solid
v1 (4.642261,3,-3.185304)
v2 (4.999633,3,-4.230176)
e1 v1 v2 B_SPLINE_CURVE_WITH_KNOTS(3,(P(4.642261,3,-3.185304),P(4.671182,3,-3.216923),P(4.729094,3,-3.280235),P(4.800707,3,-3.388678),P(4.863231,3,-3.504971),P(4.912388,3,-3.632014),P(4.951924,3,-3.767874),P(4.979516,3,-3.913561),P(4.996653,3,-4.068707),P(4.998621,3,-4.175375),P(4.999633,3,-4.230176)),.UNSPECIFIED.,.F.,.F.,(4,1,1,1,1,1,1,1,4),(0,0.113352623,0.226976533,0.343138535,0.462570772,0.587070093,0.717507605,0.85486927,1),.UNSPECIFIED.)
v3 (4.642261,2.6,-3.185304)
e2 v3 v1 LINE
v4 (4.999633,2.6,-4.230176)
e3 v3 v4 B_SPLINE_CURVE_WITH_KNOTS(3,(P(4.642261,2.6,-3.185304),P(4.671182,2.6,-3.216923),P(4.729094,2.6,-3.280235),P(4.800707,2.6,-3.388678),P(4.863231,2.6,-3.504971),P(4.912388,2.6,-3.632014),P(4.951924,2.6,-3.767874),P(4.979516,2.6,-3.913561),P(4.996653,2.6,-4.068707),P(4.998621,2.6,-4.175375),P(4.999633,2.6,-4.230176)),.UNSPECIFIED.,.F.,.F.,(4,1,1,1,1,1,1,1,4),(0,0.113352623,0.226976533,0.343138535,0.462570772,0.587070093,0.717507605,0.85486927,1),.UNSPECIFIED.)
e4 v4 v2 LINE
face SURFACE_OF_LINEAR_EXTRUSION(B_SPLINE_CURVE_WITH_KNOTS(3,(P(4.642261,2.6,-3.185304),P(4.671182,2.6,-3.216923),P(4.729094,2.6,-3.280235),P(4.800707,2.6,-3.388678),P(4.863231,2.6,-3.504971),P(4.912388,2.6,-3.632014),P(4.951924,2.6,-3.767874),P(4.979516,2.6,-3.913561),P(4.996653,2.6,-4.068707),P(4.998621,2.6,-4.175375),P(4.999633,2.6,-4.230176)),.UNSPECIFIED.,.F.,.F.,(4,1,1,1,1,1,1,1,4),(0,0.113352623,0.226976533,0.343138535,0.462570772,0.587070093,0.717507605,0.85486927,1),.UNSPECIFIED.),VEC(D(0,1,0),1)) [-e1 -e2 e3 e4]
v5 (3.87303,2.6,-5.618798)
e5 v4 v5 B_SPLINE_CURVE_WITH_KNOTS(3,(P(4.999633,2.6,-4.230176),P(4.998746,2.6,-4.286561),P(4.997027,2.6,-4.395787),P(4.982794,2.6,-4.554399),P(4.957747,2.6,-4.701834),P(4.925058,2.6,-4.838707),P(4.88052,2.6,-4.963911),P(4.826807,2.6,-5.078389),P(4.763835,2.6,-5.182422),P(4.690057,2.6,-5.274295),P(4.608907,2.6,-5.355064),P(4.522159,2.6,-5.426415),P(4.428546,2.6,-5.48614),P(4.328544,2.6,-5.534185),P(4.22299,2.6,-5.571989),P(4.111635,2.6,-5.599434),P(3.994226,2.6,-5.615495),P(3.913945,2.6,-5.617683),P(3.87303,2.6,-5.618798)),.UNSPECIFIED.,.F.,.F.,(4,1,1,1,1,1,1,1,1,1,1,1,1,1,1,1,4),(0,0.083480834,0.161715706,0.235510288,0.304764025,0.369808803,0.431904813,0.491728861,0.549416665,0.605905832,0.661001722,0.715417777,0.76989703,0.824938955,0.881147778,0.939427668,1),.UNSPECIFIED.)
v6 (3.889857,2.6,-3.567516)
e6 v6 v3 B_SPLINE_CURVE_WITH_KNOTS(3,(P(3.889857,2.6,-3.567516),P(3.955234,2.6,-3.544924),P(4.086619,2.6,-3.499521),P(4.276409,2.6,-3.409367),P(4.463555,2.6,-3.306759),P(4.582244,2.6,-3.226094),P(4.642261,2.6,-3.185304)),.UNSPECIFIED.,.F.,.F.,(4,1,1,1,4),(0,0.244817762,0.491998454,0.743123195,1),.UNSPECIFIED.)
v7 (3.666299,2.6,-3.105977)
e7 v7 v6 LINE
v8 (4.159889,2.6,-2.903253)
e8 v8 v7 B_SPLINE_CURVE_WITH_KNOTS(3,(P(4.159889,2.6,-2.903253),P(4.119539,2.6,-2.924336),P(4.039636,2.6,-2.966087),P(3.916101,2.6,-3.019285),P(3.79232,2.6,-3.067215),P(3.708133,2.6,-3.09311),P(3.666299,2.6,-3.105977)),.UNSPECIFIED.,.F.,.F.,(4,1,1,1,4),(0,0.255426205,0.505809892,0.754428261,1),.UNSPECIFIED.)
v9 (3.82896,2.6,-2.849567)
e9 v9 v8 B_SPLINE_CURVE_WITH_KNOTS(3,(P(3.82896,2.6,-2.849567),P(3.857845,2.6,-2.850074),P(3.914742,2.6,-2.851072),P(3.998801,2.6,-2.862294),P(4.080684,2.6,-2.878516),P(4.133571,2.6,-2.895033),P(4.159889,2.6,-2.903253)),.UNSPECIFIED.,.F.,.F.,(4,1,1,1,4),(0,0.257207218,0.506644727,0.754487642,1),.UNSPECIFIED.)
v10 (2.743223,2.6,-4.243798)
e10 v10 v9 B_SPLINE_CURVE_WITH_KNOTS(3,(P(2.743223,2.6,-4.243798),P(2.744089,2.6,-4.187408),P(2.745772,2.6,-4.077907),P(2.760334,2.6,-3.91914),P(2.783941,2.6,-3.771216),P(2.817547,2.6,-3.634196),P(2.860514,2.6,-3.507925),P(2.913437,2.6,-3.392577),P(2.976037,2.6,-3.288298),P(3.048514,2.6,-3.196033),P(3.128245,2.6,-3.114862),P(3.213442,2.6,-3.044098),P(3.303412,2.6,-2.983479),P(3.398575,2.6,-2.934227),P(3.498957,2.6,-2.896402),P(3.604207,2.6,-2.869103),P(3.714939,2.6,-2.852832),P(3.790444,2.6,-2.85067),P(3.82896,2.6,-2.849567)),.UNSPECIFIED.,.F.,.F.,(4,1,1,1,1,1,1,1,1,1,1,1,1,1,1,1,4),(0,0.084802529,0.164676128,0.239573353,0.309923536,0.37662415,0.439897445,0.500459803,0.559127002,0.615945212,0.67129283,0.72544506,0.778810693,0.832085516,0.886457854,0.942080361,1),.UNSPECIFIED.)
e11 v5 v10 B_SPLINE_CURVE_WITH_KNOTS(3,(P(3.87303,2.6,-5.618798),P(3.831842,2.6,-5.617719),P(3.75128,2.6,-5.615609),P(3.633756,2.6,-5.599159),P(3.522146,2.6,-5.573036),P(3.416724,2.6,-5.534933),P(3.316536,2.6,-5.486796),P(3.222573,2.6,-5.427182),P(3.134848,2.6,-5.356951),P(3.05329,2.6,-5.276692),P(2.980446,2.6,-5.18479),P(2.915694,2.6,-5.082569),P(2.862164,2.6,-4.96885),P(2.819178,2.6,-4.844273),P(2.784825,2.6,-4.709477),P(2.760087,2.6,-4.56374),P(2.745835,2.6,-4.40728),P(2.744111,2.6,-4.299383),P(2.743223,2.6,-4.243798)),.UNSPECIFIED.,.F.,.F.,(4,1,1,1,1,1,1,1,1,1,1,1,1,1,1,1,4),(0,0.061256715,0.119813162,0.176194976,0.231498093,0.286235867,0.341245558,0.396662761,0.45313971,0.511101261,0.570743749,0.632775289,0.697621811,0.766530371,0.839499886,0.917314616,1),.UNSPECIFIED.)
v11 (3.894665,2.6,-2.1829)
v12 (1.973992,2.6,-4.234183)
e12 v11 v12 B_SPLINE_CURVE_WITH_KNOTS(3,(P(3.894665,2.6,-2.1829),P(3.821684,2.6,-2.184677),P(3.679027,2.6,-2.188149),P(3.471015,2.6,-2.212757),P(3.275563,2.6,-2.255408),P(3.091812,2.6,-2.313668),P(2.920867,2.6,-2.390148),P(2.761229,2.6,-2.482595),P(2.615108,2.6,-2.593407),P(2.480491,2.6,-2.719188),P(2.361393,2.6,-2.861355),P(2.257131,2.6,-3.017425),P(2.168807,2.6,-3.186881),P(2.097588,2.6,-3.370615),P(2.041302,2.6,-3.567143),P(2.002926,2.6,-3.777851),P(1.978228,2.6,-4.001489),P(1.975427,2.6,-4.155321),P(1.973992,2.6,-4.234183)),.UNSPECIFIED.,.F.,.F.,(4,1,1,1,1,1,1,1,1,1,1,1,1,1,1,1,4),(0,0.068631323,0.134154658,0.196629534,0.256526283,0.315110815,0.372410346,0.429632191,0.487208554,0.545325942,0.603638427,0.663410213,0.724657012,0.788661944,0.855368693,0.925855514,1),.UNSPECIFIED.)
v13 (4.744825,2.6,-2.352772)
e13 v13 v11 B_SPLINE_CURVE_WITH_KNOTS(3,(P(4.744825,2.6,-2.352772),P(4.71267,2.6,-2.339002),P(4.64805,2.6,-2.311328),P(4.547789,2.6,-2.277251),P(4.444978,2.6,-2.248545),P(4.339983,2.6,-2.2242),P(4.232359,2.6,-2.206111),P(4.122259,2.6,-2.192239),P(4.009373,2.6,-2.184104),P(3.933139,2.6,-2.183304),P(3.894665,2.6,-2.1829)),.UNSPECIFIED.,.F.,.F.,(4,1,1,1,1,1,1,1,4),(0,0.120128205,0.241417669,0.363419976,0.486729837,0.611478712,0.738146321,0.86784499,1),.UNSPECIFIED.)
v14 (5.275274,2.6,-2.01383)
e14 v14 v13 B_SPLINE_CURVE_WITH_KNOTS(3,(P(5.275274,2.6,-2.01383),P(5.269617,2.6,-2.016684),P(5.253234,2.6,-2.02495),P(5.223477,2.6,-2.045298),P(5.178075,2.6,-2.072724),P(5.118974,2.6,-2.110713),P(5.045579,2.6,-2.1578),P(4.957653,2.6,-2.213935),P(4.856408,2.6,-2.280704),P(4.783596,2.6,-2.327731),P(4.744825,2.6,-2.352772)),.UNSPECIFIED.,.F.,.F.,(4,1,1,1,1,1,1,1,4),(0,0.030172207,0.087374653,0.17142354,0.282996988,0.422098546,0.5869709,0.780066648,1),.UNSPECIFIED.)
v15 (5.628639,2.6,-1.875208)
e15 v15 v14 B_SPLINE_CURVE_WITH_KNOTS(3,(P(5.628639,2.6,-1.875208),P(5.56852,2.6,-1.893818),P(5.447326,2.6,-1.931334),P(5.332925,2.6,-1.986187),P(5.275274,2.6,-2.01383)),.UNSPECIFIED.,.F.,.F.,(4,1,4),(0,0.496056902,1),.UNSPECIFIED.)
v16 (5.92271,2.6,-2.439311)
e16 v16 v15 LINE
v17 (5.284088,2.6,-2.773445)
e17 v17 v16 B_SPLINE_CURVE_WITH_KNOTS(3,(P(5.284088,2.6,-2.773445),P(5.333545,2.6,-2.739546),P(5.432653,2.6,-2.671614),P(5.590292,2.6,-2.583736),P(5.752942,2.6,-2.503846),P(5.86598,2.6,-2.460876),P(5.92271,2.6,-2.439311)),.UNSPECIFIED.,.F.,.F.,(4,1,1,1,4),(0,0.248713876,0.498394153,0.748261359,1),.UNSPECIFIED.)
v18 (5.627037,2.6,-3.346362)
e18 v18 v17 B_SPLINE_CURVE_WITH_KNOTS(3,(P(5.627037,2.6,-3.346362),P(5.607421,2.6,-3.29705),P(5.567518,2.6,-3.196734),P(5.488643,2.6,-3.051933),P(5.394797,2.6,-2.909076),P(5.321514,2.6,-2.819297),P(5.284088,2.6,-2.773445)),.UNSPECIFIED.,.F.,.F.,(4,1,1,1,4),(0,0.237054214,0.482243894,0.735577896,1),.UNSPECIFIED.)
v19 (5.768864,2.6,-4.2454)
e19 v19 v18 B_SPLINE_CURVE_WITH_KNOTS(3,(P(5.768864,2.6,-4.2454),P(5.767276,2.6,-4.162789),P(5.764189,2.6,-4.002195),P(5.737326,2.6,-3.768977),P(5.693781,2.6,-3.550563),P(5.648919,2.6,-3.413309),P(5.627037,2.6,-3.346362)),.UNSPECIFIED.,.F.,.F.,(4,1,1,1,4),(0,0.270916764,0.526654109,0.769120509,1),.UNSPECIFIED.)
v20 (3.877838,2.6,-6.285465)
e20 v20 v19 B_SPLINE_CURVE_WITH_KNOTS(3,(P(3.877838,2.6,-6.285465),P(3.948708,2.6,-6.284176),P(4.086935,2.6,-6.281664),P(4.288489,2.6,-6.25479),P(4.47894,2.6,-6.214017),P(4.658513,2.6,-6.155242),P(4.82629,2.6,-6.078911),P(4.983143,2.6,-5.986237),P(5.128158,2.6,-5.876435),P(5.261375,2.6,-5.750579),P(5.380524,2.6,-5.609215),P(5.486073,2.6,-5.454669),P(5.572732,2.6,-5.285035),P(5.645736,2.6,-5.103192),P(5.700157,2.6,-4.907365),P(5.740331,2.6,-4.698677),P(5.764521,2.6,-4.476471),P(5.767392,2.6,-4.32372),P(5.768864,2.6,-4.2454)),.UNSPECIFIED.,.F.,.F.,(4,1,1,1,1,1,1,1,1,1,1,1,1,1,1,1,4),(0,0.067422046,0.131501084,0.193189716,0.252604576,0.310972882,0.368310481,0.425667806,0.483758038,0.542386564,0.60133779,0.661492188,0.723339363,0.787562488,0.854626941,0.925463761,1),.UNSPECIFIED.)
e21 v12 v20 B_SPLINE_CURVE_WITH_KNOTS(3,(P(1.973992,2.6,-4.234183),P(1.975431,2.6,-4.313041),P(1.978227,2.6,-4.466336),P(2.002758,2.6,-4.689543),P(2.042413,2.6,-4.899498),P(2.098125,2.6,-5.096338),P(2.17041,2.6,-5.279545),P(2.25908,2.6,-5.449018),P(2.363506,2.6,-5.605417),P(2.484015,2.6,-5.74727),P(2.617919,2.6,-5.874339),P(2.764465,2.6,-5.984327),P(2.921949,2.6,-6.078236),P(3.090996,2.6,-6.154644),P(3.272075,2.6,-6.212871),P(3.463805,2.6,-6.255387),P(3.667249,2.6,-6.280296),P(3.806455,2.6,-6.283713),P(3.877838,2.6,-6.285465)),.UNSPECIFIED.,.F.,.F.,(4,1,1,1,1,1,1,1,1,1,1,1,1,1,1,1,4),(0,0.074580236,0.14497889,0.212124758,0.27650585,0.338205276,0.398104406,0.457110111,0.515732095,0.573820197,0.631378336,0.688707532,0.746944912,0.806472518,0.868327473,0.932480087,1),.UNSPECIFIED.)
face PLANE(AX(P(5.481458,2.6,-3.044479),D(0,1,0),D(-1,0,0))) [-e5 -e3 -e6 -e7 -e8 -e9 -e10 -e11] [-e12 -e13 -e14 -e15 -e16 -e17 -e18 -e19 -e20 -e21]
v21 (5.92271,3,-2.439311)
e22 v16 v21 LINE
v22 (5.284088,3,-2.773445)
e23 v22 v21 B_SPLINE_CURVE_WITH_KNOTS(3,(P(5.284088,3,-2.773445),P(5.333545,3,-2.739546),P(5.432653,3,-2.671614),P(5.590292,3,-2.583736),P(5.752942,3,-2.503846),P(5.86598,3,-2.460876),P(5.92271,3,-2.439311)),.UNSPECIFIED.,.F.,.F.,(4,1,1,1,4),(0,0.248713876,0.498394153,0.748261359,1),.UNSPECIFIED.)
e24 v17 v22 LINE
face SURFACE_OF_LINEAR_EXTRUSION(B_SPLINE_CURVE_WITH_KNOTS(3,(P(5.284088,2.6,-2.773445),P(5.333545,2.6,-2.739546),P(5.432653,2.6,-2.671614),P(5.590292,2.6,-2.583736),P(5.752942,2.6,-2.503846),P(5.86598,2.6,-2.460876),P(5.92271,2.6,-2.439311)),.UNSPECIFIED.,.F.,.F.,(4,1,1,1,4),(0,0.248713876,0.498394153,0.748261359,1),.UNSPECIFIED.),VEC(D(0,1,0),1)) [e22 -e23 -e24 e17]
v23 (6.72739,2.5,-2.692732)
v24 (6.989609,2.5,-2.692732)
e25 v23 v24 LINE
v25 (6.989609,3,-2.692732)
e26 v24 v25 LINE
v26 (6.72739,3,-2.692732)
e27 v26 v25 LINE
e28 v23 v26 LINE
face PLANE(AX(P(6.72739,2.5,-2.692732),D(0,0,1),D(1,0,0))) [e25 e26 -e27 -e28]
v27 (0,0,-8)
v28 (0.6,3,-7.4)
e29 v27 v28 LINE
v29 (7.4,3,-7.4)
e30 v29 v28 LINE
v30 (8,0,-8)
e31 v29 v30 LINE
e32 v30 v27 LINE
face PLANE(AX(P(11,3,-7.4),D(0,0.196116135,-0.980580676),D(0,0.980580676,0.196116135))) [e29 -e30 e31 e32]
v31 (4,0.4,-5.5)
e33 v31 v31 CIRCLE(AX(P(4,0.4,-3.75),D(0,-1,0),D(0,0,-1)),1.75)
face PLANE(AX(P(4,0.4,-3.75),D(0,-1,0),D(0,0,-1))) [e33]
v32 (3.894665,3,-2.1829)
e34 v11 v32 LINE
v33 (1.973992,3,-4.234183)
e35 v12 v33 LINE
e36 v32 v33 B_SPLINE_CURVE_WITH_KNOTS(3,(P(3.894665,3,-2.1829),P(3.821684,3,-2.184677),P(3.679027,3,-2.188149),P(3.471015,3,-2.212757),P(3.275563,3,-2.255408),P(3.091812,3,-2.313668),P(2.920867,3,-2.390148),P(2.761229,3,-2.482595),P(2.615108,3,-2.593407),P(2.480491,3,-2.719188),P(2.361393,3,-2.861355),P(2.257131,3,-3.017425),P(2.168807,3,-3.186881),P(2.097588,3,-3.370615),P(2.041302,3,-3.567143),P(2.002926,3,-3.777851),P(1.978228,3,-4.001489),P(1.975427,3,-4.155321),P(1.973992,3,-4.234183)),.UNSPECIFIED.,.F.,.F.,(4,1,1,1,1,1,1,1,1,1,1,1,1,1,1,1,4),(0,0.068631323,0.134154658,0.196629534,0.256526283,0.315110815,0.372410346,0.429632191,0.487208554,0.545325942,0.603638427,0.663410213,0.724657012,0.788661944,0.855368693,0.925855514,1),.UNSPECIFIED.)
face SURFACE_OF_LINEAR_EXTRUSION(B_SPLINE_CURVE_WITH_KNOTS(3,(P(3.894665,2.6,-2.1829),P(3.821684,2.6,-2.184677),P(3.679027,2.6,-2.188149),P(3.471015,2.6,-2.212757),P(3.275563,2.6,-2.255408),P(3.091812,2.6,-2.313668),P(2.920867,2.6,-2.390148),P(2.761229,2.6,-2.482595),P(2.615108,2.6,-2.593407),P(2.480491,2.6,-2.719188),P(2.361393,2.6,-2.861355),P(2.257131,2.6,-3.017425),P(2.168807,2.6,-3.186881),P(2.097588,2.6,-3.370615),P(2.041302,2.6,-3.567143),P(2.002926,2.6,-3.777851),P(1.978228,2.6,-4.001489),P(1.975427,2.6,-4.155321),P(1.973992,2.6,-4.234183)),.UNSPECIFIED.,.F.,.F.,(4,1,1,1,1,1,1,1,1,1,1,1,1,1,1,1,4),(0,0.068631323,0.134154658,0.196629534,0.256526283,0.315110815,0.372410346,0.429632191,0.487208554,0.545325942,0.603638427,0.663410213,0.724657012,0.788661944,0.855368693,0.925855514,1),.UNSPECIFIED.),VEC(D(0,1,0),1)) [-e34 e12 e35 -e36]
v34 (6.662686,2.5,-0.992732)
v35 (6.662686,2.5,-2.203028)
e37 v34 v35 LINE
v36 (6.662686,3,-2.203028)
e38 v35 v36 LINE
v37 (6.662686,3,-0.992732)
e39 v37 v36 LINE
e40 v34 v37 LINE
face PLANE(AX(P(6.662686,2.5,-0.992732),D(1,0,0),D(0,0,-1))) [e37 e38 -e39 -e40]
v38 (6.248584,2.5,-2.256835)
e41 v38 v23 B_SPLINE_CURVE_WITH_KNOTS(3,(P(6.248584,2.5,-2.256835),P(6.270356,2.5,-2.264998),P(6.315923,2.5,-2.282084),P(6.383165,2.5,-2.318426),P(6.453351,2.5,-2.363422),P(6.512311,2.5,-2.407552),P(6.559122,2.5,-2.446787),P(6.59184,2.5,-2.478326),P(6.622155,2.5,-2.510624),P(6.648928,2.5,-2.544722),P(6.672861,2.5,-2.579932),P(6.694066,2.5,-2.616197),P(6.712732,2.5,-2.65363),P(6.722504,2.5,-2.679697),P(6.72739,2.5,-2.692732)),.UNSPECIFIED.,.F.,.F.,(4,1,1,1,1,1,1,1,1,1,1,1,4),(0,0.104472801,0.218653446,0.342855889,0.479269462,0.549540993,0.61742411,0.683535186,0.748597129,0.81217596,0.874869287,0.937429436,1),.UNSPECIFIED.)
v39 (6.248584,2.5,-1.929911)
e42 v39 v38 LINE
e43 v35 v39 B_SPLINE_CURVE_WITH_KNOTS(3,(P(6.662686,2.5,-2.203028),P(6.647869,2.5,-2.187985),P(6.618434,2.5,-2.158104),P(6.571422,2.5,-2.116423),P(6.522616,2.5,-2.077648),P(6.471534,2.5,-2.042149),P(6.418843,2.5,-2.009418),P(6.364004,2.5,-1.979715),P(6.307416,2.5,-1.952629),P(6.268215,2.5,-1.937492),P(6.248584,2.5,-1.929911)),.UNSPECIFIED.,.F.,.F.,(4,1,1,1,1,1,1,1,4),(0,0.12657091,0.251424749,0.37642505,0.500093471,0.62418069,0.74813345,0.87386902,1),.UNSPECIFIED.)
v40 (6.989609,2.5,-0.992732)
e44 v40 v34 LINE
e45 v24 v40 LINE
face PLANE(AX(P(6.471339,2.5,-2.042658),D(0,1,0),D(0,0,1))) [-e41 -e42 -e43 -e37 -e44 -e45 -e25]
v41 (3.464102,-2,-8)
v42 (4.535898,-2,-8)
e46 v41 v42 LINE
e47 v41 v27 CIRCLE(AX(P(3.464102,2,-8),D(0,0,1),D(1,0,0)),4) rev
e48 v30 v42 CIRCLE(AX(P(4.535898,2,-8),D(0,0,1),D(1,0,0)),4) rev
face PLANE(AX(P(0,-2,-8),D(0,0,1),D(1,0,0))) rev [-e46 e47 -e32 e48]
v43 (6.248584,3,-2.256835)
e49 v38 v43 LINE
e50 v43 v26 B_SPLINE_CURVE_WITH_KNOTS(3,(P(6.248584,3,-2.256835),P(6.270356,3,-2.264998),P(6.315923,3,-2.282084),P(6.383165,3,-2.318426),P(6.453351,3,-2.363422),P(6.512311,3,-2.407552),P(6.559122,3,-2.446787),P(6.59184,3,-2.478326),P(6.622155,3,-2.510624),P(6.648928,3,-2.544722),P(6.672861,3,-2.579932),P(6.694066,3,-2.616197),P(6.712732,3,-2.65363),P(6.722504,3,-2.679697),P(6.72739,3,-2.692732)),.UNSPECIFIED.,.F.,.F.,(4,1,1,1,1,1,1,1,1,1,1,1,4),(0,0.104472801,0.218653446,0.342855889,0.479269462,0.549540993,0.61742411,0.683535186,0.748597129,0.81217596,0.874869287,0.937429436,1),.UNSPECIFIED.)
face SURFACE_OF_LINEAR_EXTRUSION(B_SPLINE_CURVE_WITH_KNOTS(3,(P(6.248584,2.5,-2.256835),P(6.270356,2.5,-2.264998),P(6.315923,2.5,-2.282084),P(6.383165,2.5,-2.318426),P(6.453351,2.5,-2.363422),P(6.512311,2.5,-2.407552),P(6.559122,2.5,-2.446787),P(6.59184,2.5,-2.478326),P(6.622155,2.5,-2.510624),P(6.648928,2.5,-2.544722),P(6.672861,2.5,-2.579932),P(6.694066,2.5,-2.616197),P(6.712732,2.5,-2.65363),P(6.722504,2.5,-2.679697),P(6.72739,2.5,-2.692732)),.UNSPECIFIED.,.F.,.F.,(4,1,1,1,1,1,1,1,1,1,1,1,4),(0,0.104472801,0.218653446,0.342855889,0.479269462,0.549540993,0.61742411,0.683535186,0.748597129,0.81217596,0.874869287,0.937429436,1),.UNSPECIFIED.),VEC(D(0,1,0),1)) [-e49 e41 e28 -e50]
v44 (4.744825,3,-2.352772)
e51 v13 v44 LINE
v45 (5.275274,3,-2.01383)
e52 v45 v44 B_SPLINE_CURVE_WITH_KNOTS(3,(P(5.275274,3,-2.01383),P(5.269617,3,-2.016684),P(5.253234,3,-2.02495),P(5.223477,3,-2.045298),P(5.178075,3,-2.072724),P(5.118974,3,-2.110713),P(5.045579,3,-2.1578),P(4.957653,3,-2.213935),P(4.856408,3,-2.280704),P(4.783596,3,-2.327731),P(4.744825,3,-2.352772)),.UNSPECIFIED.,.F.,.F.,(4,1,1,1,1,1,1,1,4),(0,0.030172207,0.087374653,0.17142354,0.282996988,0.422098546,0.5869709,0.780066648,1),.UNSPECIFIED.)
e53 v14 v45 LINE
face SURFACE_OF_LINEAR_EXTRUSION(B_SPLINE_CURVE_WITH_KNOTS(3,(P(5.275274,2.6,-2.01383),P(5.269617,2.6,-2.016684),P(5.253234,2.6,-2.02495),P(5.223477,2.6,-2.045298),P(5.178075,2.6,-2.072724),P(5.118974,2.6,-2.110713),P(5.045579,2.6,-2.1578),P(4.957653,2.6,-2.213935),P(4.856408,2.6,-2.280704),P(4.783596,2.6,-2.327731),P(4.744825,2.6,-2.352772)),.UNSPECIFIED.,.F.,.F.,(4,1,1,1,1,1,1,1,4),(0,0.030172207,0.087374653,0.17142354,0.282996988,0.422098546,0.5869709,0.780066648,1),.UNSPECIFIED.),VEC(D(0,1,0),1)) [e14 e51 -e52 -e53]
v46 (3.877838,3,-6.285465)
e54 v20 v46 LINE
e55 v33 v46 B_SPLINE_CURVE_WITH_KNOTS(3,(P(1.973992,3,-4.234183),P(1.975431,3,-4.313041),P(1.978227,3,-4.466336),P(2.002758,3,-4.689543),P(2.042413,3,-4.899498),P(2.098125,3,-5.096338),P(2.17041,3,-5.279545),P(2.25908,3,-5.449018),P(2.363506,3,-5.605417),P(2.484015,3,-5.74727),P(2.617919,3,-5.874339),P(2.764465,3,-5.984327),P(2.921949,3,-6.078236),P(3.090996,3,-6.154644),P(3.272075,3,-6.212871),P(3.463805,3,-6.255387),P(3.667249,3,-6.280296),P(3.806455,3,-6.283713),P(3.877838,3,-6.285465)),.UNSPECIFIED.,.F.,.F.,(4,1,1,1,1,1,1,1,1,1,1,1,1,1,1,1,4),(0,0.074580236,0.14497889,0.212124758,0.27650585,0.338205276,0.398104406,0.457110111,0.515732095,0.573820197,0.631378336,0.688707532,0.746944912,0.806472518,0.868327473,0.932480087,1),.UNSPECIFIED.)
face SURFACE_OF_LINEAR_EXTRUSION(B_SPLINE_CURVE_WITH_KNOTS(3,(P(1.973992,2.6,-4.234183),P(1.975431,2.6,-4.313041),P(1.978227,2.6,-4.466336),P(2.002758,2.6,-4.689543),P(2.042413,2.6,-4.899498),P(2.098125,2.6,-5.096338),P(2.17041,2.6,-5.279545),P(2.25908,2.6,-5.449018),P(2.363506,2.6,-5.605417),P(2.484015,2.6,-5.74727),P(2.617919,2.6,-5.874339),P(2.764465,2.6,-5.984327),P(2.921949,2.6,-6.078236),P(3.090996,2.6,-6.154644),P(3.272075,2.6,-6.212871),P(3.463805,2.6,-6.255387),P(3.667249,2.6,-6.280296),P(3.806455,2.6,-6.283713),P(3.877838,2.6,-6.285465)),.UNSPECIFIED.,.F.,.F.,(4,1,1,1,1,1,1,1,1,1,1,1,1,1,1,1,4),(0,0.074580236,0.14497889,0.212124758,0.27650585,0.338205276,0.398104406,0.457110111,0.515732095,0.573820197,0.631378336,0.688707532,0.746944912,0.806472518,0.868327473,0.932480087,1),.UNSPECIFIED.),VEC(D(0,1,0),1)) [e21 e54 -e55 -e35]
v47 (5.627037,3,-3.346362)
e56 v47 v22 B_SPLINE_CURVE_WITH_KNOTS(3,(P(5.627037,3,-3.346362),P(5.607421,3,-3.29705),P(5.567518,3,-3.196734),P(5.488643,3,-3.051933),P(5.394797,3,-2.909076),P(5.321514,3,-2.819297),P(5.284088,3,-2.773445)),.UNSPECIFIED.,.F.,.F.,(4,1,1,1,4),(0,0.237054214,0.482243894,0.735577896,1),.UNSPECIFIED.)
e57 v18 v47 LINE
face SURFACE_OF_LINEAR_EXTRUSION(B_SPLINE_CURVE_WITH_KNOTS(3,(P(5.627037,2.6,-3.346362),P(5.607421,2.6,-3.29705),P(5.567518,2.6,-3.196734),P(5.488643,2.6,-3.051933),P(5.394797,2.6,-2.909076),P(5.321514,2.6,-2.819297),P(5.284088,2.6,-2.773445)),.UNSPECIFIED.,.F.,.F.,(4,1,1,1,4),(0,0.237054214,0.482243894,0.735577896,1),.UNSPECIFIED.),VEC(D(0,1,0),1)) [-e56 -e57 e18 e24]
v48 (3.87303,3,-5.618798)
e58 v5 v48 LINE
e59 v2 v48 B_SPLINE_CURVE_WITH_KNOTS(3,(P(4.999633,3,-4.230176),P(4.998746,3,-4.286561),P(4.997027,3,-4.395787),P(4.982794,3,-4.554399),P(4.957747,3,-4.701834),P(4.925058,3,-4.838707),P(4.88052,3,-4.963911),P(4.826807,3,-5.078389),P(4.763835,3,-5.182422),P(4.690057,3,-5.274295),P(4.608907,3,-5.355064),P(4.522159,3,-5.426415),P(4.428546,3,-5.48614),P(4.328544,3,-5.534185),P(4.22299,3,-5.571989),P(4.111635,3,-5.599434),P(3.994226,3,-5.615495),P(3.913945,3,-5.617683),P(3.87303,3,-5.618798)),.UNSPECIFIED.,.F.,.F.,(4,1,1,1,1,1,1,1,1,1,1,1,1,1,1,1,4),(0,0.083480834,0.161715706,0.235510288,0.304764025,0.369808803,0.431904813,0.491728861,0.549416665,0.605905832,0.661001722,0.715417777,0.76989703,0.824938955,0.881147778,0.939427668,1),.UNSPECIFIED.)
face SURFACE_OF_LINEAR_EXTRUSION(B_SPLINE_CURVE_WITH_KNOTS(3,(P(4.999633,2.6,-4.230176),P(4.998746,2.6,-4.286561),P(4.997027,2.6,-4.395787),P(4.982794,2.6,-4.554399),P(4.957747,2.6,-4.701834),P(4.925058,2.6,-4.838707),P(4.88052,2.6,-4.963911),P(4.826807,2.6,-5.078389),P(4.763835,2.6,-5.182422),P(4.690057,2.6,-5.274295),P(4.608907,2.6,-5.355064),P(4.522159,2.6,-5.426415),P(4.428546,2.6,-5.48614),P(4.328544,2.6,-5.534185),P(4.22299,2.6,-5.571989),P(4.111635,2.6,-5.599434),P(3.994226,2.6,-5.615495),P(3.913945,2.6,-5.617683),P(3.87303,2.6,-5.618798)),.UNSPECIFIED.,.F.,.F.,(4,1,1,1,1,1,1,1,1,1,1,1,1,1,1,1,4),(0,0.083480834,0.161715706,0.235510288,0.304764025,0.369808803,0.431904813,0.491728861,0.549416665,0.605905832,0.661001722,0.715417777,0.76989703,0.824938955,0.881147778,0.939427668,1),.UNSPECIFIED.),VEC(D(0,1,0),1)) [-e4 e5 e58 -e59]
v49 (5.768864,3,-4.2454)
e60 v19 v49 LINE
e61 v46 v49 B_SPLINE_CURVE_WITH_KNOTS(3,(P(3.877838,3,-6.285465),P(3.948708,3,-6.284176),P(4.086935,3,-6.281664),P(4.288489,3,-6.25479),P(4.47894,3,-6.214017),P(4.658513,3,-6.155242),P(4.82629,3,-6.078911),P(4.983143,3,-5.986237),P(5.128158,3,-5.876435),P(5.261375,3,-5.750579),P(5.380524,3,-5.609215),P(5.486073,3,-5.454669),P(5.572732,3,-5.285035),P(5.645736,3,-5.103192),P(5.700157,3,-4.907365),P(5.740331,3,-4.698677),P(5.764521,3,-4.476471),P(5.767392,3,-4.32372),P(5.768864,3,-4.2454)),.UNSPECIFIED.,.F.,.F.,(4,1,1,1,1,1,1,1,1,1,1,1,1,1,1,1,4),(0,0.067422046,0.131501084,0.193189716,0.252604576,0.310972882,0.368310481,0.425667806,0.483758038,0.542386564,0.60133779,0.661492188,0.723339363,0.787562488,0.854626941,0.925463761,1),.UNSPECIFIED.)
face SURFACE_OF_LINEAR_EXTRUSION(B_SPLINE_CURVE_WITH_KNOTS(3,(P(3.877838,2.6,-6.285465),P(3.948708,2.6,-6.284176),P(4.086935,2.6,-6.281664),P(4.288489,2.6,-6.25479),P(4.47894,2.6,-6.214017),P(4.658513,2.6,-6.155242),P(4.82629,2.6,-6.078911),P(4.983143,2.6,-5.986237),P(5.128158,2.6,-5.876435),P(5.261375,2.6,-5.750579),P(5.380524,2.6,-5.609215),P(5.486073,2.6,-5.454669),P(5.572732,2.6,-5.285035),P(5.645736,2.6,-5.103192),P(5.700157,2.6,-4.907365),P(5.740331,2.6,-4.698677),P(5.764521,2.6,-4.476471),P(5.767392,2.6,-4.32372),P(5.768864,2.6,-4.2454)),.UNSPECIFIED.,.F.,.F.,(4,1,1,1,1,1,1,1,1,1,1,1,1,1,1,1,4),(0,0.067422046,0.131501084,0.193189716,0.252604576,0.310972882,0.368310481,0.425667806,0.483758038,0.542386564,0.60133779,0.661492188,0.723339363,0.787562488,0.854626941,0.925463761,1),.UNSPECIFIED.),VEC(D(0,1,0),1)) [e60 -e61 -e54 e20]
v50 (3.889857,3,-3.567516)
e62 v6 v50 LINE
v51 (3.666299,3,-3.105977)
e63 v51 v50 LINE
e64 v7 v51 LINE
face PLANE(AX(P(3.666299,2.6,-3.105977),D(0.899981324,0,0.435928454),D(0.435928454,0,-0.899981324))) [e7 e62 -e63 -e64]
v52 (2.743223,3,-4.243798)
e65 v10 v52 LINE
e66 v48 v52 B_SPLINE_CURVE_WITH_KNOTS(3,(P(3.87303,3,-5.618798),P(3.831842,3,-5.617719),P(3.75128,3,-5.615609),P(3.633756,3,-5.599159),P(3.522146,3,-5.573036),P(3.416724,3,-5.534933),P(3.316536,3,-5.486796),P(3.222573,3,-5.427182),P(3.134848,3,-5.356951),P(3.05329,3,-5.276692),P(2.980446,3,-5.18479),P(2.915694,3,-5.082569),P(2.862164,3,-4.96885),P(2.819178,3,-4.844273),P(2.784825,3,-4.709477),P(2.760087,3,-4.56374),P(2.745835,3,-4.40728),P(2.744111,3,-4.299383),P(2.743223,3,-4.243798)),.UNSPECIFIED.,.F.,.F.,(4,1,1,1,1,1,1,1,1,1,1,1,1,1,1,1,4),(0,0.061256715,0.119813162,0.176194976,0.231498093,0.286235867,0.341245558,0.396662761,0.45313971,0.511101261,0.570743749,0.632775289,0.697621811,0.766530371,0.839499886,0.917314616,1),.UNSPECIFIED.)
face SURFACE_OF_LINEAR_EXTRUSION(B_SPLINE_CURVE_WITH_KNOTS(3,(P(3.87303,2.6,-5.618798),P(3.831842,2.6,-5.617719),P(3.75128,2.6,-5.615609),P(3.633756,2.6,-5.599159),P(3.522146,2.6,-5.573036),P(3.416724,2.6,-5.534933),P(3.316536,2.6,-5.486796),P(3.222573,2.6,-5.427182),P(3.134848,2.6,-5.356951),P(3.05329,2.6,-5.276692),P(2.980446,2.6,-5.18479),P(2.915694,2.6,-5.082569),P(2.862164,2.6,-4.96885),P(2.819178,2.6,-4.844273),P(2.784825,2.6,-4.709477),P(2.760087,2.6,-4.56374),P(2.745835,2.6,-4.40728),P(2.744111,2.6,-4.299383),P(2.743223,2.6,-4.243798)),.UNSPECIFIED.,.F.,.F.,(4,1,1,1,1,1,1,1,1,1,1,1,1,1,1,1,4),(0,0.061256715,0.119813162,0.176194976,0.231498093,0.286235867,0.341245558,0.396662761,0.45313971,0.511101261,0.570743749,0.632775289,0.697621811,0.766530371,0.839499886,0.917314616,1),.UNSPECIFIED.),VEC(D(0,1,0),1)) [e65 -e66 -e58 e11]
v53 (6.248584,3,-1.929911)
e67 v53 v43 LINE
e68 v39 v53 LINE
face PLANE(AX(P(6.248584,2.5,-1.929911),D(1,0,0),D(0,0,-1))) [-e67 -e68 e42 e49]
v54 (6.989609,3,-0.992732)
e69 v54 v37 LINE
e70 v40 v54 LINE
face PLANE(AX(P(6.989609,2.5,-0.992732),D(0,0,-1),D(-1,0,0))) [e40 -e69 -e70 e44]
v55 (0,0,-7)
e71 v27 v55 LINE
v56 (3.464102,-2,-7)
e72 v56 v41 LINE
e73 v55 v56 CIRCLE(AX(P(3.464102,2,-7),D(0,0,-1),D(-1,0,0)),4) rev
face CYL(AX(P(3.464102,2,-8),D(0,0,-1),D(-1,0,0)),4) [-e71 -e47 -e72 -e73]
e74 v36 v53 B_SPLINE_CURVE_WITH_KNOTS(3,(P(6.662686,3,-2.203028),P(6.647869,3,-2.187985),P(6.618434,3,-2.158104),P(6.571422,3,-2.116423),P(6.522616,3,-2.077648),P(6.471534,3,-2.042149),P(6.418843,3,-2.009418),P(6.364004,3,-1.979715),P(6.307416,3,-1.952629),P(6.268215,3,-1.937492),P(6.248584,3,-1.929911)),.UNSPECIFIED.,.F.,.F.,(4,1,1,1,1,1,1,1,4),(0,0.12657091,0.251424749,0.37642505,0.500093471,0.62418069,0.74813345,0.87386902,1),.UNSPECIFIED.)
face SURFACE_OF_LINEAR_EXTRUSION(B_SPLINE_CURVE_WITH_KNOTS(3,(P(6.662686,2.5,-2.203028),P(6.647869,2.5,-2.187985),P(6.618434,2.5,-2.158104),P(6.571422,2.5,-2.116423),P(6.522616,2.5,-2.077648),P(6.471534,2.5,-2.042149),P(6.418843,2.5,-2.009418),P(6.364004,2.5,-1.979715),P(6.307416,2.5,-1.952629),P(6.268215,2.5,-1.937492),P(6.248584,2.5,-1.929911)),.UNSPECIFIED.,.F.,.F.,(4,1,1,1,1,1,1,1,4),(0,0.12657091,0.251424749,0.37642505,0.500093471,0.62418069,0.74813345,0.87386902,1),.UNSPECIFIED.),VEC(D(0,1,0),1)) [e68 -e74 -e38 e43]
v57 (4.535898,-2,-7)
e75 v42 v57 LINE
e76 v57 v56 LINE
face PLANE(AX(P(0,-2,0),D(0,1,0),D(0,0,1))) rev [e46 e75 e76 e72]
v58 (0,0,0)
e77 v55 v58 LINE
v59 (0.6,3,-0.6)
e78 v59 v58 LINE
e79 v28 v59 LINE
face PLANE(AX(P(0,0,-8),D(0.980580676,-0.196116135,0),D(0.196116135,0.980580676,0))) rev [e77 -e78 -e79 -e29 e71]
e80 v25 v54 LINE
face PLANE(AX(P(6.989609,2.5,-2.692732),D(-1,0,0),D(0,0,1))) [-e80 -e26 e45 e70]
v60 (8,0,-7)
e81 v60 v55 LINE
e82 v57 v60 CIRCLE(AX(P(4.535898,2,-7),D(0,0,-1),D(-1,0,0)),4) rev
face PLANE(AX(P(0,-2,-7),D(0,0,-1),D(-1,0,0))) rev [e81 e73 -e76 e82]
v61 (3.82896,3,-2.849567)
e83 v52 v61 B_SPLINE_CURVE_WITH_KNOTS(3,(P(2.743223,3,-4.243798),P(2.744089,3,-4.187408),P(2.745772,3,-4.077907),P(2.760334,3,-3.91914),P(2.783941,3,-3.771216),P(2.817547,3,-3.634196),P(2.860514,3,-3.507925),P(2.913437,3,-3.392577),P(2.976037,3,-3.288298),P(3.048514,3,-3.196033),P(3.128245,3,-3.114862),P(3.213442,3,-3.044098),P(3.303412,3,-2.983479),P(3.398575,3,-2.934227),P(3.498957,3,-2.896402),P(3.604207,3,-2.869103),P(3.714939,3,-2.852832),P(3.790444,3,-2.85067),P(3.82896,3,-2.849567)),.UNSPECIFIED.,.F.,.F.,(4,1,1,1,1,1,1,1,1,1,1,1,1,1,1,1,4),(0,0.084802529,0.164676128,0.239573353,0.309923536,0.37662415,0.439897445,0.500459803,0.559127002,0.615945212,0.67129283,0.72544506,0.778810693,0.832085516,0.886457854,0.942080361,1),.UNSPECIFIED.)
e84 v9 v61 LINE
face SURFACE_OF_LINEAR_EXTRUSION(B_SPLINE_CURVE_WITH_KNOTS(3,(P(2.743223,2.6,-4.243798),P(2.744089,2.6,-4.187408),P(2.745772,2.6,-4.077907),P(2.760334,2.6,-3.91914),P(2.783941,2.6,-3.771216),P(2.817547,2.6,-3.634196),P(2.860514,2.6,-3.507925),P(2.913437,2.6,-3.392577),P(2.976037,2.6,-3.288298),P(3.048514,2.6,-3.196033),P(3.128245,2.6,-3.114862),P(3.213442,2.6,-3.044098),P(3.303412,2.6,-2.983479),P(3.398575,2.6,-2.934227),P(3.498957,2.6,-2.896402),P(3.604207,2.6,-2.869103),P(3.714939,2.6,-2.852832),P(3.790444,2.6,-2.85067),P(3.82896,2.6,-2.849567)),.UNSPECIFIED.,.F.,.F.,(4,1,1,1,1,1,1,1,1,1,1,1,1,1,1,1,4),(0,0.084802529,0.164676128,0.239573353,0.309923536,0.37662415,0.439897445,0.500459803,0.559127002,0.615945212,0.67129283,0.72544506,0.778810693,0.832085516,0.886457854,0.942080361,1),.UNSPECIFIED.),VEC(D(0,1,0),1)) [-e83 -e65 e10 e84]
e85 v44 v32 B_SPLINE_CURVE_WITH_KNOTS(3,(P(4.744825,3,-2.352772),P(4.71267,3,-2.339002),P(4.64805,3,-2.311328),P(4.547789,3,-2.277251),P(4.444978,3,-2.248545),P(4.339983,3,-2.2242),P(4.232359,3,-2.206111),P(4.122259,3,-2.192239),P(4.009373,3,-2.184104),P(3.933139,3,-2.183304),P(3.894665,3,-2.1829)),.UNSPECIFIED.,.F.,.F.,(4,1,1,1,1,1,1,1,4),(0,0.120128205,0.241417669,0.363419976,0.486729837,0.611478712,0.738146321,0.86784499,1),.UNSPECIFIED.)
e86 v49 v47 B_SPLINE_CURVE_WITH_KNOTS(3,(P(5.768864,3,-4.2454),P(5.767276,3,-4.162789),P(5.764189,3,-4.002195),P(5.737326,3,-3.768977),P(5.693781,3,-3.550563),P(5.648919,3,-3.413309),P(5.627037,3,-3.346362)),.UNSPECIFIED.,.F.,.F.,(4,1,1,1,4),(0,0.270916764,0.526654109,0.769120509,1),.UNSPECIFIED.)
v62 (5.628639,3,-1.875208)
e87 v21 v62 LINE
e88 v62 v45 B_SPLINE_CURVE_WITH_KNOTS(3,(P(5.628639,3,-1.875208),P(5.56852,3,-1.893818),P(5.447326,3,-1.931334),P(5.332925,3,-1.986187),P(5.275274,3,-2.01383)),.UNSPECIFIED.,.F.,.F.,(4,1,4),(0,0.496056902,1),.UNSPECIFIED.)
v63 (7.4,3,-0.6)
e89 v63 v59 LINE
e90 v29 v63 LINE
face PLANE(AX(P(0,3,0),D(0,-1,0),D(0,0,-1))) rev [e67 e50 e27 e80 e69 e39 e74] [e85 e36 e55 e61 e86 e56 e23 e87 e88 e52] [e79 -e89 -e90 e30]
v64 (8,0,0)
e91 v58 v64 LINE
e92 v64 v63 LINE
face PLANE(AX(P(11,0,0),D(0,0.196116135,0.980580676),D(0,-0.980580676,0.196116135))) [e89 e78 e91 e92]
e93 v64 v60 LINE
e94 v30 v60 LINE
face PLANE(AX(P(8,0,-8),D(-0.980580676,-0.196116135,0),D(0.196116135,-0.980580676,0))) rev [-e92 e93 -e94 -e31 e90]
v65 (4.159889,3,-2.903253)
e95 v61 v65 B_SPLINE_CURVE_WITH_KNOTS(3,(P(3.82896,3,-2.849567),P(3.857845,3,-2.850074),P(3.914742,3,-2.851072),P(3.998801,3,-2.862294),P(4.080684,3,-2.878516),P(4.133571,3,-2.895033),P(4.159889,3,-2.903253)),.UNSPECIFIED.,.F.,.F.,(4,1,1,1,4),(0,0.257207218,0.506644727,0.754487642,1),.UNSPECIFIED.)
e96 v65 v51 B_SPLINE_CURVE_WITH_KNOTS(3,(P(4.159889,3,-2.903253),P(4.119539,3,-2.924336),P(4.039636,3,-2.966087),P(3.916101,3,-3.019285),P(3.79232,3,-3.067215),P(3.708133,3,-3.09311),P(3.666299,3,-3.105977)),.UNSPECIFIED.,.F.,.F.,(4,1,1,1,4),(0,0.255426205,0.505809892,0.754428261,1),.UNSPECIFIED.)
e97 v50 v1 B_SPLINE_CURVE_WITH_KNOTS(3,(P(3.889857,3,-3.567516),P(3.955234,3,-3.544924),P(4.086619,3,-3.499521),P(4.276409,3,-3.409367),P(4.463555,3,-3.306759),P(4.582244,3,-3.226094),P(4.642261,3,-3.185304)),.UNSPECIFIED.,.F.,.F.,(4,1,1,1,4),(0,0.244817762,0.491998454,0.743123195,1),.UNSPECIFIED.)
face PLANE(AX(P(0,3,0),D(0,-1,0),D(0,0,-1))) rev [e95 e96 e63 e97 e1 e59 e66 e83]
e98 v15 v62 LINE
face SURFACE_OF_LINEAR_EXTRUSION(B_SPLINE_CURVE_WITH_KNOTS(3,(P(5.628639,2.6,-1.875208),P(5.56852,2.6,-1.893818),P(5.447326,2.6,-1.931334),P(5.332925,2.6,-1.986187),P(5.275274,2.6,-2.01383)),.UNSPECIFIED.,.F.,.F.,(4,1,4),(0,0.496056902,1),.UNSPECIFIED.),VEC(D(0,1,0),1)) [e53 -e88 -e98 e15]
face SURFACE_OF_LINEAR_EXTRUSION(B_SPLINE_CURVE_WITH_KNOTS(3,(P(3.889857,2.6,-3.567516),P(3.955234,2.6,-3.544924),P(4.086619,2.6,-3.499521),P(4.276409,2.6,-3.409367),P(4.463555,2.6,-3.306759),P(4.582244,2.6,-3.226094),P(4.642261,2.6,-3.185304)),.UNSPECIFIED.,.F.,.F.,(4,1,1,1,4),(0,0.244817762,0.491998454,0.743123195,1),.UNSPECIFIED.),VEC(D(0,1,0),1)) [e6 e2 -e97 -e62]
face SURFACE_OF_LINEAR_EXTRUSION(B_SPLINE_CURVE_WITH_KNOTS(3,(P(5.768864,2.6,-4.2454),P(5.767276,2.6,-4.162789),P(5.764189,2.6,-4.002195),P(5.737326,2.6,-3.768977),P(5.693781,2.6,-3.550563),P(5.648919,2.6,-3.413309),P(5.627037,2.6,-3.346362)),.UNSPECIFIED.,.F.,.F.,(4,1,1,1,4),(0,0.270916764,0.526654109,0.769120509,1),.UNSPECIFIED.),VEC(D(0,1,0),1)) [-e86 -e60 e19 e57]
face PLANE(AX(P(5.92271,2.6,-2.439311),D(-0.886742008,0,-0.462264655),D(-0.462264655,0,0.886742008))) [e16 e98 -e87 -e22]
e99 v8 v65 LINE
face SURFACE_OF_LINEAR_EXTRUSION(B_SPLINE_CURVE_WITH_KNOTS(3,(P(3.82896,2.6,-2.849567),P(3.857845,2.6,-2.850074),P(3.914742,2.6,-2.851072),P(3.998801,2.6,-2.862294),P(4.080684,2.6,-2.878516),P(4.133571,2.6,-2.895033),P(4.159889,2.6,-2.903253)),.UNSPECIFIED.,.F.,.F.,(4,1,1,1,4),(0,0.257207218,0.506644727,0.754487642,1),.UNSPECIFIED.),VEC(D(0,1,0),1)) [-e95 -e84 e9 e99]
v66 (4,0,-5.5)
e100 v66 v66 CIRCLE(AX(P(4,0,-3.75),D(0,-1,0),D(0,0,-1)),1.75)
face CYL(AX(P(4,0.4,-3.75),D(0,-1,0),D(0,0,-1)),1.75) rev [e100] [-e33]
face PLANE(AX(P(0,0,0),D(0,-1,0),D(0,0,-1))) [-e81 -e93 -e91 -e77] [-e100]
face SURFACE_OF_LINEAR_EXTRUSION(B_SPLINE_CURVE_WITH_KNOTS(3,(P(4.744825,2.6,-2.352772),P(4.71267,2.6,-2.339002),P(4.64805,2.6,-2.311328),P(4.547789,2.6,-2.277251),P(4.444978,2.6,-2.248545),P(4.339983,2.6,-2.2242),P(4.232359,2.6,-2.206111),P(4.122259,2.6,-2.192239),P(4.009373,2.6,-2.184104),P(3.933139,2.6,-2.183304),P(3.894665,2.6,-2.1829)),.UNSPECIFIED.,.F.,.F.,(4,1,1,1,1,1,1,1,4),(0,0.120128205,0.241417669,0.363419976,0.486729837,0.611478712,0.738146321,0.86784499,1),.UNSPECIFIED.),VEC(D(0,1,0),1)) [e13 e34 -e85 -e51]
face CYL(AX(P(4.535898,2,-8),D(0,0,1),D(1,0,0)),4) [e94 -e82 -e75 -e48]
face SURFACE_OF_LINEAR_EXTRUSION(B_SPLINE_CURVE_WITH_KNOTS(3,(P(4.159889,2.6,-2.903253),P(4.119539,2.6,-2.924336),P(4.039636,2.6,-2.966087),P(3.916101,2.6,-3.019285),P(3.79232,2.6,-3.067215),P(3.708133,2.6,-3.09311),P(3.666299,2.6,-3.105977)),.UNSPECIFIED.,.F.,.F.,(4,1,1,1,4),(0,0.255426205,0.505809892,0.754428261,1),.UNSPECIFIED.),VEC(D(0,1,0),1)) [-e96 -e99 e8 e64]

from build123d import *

# Parameters (mm, degrees)
SKETCH1_W               = 8
SKETCH1_H               = 8
BOSS_EXTRUDE1_DEPTH     = 3
CUT_EXTRUDE1_DEPTH      = 12.704699911
CUT_EXTRUDE1_DEPTH_BACK = 12.704699911
CUT_EXTRUDE2_DEPTH      = 11
SKETCH4_R               = 1.75
CUT_EXTRUDE3_DEPTH      = 0.4
SKETCH5_W               = 8
SKETCH5_H               = 1
BOSS_EXTRUDE2_DEPTH     = 2
FILLET1_R               = 4
CUT_EXTRUDE4_DEPTH      = 0.4
CUT_EXTRUDE5_DEPTH      = 0.5


with BuildPart() as part:
    # Sketch1 → Boss-Extrude1 (new body)
    with BuildSketch(Plane(origin=(0, 0, 0), x_dir=(1, 0, 0), z_dir=(0, 1, 0))):
        with Locations((4, 4)):
            Rectangle(SKETCH1_W, SKETCH1_H)
    extrude(amount=BOSS_EXTRUDE1_DEPTH)

    # Sketch2 → Cut-Extrude1 (cut, two sides: drawn at the far end of the back side and taken through both)
    with BuildSketch(Plane.XY.offset(-CUT_EXTRUDE1_DEPTH_BACK)):
        Polygon((0, 0), (0.6, 3), (0, 3), align=None)
        Polygon((8, 0), (7.4, 3), (8, 3), align=None)
    extrude(amount=CUT_EXTRUDE1_DEPTH + CUT_EXTRUDE1_DEPTH_BACK, mode=Mode.SUBTRACT)

    # Sketch3 → Cut-Extrude2 (cut)
    with BuildSketch(Plane(origin=(0, 0, 0), x_dir=(0, 0, -1), z_dir=(1, 0, 0))):
        Polygon((0, 0), (0.6, 3), (0, 3), align=None)
        Polygon((8, 3), (7.4, 3), (8, 0), align=None)
    extrude(amount=CUT_EXTRUDE2_DEPTH, mode=Mode.SUBTRACT)

    # Sketch4 → Cut-Extrude3 (cut)
    with BuildSketch(Plane.XZ):
        with Locations(Location((4, -3.75, 0), (0, 0, 270))):
            Circle(SKETCH4_R)
    extrude(amount=-CUT_EXTRUDE3_DEPTH, mode=Mode.SUBTRACT)

    # Sketch5 → Boss-Extrude2 (add)
    with BuildSketch(Plane.XZ):
        with Locations((4, -7.5)):
            Rectangle(SKETCH5_W, SKETCH5_H)
    extrude(amount=BOSS_EXTRUDE2_DEPTH)

    # Fillet1
    # the kernel refuses this fillet: 4 mm, written as the material it takes off along each edge
    with BuildSketch(Plane(origin=(8, -2, -16.660254038), x_dir=(0, 1, 0), z_dir=(0, 0, 1)), Plane(origin=(0, -2, 1.660254038), x_dir=(0, 1, 0), z_dir=(0, 0, -1))) as fillet1_piece_1:
        with BuildLine():
            CenterArc((4, 3.464101615), FILLET1_R, 180, 60)
            Line((0, 3.464101615), (-0.08, 3.464101615))
            Line((-0.08, 3.464101615), (-0.08, 0))
            Line((-0.08, 0), (0, -0.08))
            ThreePointArc((0, -0.08), (1, -0.08), (1.96, -0.069282032))
            Line((1.96, -0.069282032), (2, 0))
        make_face()
    extrude(amount=18.320508076, mode=Mode.SUBTRACT)

    # Sketch6 → Cut-Extrude4 (cut)
    with BuildSketch(Plane(origin=(0, 3, 0), x_dir=(1, 0, 0), z_dir=(0, 1, 0))):
        with BuildLine():
            add(Edge.make_bspline(
                [(5.284087955, 2.773445367), (5.333545491, 2.739545524), (5.432652736, 2.671614118), (5.590291823, 2.583736248), (5.752942084, 2.503846486), (5.865979951, 2.460876102), (5.92270975, 2.439310751)],
                knots=[0, 0, 0, 0, 0.994855506, 1.99357661, 2.993045438, 4, 4, 4, 4], degree=3))
            Line((5.92270975, 2.439310751), (5.628639237, 1.875208187))
            add(Edge.make_bspline(
                [(5.628639237, 1.875208187), (5.568520037, 1.893818156), (5.447325875, 1.93133395), (5.332925255, 1.986187111), (5.275273852, 2.013829982)],
                knots=[0, 0, 0, 0, 0.992113803, 2, 2, 2, 2], degree=3))
            add(Edge.make_bspline(
                [(5.275273852, 2.013829982), (5.26961656, 2.016684314), (5.253233801, 2.024950075), (5.223476786, 2.045298413), (5.178074812, 2.072724498), (5.118973761, 2.11071311), (5.045578888, 2.157800121), (4.95765273, 2.213934729), (4.856407872, 2.280704114), (4.783596416, 2.327731001), (4.744825134, 2.35277229)],
                knots=[0, 0, 0, 0, 0.241377655, 0.698997227, 1.371388316, 2.263975901, 3.376788369, 4.695767198, 6.240533187, 8, 8, 8, 8], degree=3))
            add(Edge.make_bspline(
                [(4.744825134, 2.35277229), (4.712670389, 2.339001865), (4.648050063, 2.311327899), (4.547788838, 2.27725121), (4.444978029, 2.248544986), (4.339982896, 2.224200245), (4.232359046, 2.206111381), (4.122258624, 2.192239309), (4.00937299, 2.18410397), (3.933139287, 2.183304154), (3.894664878, 2.182900495)],
                knots=[0, 0, 0, 0, 0.961025642, 1.931341354, 2.907359807, 3.893838693, 4.891829695, 5.905170566, 6.942759923, 8, 8, 8, 8], degree=3))
            add(Edge.make_bspline(
                [(3.894664878, 2.182900495), (3.821683976, 2.184676763), (3.679027131, 2.188148859), (3.471015208, 2.212756542), (3.275562804, 2.255408477), (3.091812023, 2.313667662), (2.920867424, 2.390147666), (2.761229426, 2.482594503), (2.615108223, 2.593406711), (2.480490537, 2.71918809), (2.361392609, 2.861354588), (2.257130725, 3.017424584), (2.168806746, 3.186880722), (2.097587685, 3.370615377), (2.041301668, 3.567142879), (2.002926315, 3.777850586), (1.978227581, 4.001488849), (1.975427333, 4.155321196), (1.973991801, 4.234182546)],
                knots=[0, 0, 0, 0, 1.098101164, 2.146474535, 3.146072545, 4.104420533, 5.041773038, 5.958565538, 6.874115049, 7.795336865, 8.725215067, 9.658214839, 10.614563411, 11.594512188, 12.618591104, 13.685899083, 14.813688224, 16, 16, 16, 16], degree=3))
            add(Edge.make_bspline(
                [(1.973991801, 4.234182546), (1.97543059, 4.313040679), (1.978227497, 4.466335509), (2.002757559, 4.689542909), (2.042412611, 4.899497801), (2.098124704, 5.096337583), (2.170410456, 5.279545107), (2.259079723, 5.449017762), (2.363505524, 5.605417057), (2.484015277, 5.747270094), (2.617919267, 5.874338646), (2.764464989, 5.984327234), (2.9219486, 6.078236158), (3.090996271, 6.154643933), (3.272074664, 6.212871015), (3.463805003, 6.255387163), (3.667248709, 6.280295733), (3.806454886, 6.283712517), (3.877837955, 6.285464598)],
                knots=[0, 0, 0, 0, 1.193283781, 2.319662245, 3.393996131, 4.424093603, 5.411284417, 6.369670503, 7.313761776, 8.251713527, 9.181123148, 10.102053383, 11.01932051, 11.951118596, 12.903560284, 13.893239571, 14.919681386, 16, 16, 16, 16], degree=3))
            add(Edge.make_bspline(
                [(3.877837955, 6.285464598), (3.948708316, 6.284176334), (4.086935049, 6.281663683), (4.288489067, 6.254790298), (4.478939684, 6.214016744), (4.658513444, 6.155241629), (4.826290277, 6.078911265), (4.983143341, 5.98623667), (5.128157857, 5.876434989), (5.26137487, 5.750578969), (5.380523981, 5.609215368), (5.486073462, 5.454669187), (5.572731816, 5.285035211), (5.645736122, 5.103191508), (5.700157026, 4.90736457), (5.740330715, 4.69867705), (5.764520815, 4.476471411), (5.76739165, 4.323719862), (5.768863596, 4.245400495)],
                knots=[0, 0, 0, 0, 1.078752742, 2.104017338, 3.091035458, 4.041673215, 4.975566109, 5.892967701, 6.810684895, 7.740128604, 8.678185021, 9.621404646, 10.583875016, 11.573429805, 12.6009998, 13.674031063, 14.80742018, 16, 16, 16, 16], degree=3))
            add(Edge.make_bspline(
                [(5.768863596, 4.245400495), (5.767275795, 4.16278925), (5.764189157, 4.002195454), (5.737326284, 3.768977018), (5.693780668, 3.550562854), (5.648918616, 3.41330904), (5.627036673, 3.346362034)],
                knots=[0, 0, 0, 0, 1.083667057, 2.106616435, 3.076482036, 4, 4, 4, 4], degree=3))
            add(Edge.make_bspline(
                [(5.627036673, 3.346362034), (5.607421404, 3.297050064), (5.567517691, 3.196733787), (5.488642668, 3.051933408), (5.394797316, 2.909076479), (5.321514211, 2.819296637), (5.284087955, 2.773445367)],
                knots=[0, 0, 0, 0, 0.948216854, 1.928975575, 2.942311585, 4, 4, 4, 4], degree=3))
        make_face()
        with BuildLine():
            add(Edge.make_bspline(
                [(4.642261032, 3.185304341), (4.671182259, 3.216922768), (4.72909393, 3.280235293), (4.800707281, 3.388678336), (4.863230922, 3.50497094), (4.912388312, 3.632014464), (4.951923574, 3.76787431), (4.97951585, 3.913560578), (4.996652709, 4.068707035), (4.998621406, 4.175375245), (4.999632827, 4.230176136)],
                knots=[0, 0, 0, 0, 0.906820982, 1.815812261, 2.745108282, 3.70056618, 4.696560745, 5.740060838, 6.83895416, 8, 8, 8, 8], degree=3))
            add(Edge.make_bspline(
                [(4.999632827, 4.230176136), (4.998745764, 4.286560817), (4.997027382, 4.395786947), (4.982794262, 4.554398979), (4.957747484, 4.70183414), (4.925058455, 4.838707416), (4.88052022, 4.963910999), (4.826807351, 5.078388614), (4.763835344, 5.182421929), (4.690056733, 5.274294514), (4.608907177, 5.355063587), (4.522159409, 5.426414517), (4.428546166, 5.486139657), (4.328544236, 5.534184829), (4.222990468, 5.571989212), (4.111634776, 5.59943433), (3.994225982, 5.615495039), (3.913944994, 5.6176829), (3.873030263, 5.618797931)],
                knots=[0, 0, 0, 0, 1.335693338, 2.587451293, 3.768164612, 4.876224393, 5.916940853, 6.910477009, 7.867661778, 8.790666633, 9.694493319, 10.576027549, 11.446684429, 12.318352473, 13.199023277, 14.098364444, 15.030842682, 16, 16, 16, 16], degree=3))
            add(Edge.make_bspline(
                [(3.873030263, 5.618797931), (3.831841607, 5.617719084), (3.751279942, 5.615608947), (3.633755604, 5.599158788), (3.522145798, 5.573035665), (3.416723766, 5.534932642), (3.316536446, 5.486796326), (3.222573421, 5.427181815), (3.134847786, 5.356951252), (3.053289548, 5.276692152), (2.980446173, 5.184790487), (2.915694165, 5.082568667), (2.862164439, 4.968850144), (2.819178201, 4.84427298), (2.784825228, 4.709477379), (2.760087026, 4.563739976), (2.745835322, 4.407279692), (2.744110931, 4.299383286), (2.74322257, 4.243797931)],
                knots=[0, 0, 0, 0, 0.980107447, 1.917010591, 2.819119613, 3.703969481, 4.579773866, 5.459928929, 6.346604172, 7.250235365, 8.177620171, 9.131899985, 10.124404622, 11.161948974, 12.264485933, 13.431998172, 14.677033863, 16, 16, 16, 16], degree=3))
            add(Edge.make_bspline(
                [(2.74322257, 4.243797931), (2.744089067, 4.187408458), (2.745771696, 4.077907007), (2.760333697, 3.91913972), (2.783941374, 3.771215716), (2.817547327, 3.634196218), (2.86051391, 3.507924697), (2.913437174, 3.392577112), (2.976036542, 3.288297709), (3.048513511, 3.196032652), (3.128245057, 3.114861766), (3.213441608, 3.04409835), (3.303411645, 2.983479498), (3.39857486, 2.934226809), (3.498956775, 2.896402137), (3.604207339, 2.869103357), (3.714939061, 2.852831885), (3.790443662, 2.850669982), (3.82895975, 2.849567162)],
                knots=[0, 0, 0, 0, 1.356840463, 2.634818045, 3.833173645, 4.958776583, 6.025986406, 7.038359119, 8.007356852, 8.946032033, 9.855123386, 10.740685277, 11.607120956, 12.460971081, 13.313368256, 14.183325659, 15.073285775, 16, 16, 16, 16], degree=3))
            add(Edge.make_bspline(
                [(3.82895975, 2.849567162), (3.857844622, 2.850073951), (3.914741814, 2.851072222), (3.998801079, 2.862293633), (4.080683558, 2.878515583), (4.133570622, 2.895033243), (4.159889237, 2.903253059)],
                knots=[0, 0, 0, 0, 1.028828871, 2.026578908, 3.017950568, 4, 4, 4, 4], degree=3))
            add(Edge.make_bspline(
                [(4.159889237, 2.903253059), (4.119539232, 2.924336443), (4.039635796, 2.966086993), (3.916101198, 3.019284802), (3.792319766, 3.067214804), (3.708133251, 3.09310976), (3.666299493, 3.105977418)],
                knots=[0, 0, 0, 0, 1.021704821, 2.023239566, 3.017713044, 4, 4, 4, 4], degree=3))
            Line((3.666299493, 3.105977418), (3.889857186, 3.56751588))
            add(Edge.make_bspline(
                [(3.889857186, 3.56751588), (3.955233958, 3.544923565), (4.086618506, 3.49952088), (4.276409331, 3.409366748), (4.463555304, 3.306758821), (4.582244486, 3.226093623), (4.642261032, 3.185304341)],
                knots=[0, 0, 0, 0, 0.979271047, 1.967993817, 2.972492781, 4, 4, 4, 4], degree=3))
        make_face(mode=Mode.SUBTRACT)
    extrude(amount=-CUT_EXTRUDE4_DEPTH, mode=Mode.SUBTRACT)

    # Sketch7 → Cut-Extrude5 (cut)
    with BuildSketch(Plane(origin=(0, 3, 0), x_dir=(1, 0, 0), z_dir=(0, 1, 0))):
        with BuildLine():
            Line((6.989609495, 0.992731968), (6.662686419, 0.992731968))
            Line((6.662686419, 0.992731968), (6.662686419, 2.203028442))
            add(Edge.make_bspline(
                [(6.662686419, 2.203028442), (6.647868508, 2.187985499), (6.618433709, 2.158103687), (6.571421698, 2.116422543), (6.522616062, 2.07764809), (6.471533827, 2.042148614), (6.418842766, 2.009418309), (6.364004407, 1.979715431), (6.307416238, 1.952628999), (6.268215163, 1.937491891), (6.248583854, 1.929911455)],
                knots=[0, 0, 0, 0, 1.012567276, 2.011397996, 3.011400399, 4.000747768, 4.993445519, 5.985067596, 6.990952157, 8, 8, 8, 8], degree=3))
            Line((6.248583854, 1.929911455), (6.248583854, 2.256834532))
            add(Edge.make_bspline(
                [(6.248583854, 2.256834532), (6.270355964, 2.264998139), (6.315923296, 2.282083933), (6.383165354, 2.318426283), (6.453350876, 2.363421778), (6.512310721, 2.40755194), (6.559122414, 2.44678718), (6.591840229, 2.478326157), (6.622155165, 2.510623705), (6.648927745, 2.544722271), (6.672860762, 2.579932457), (6.694066458, 2.616196741), (6.712732345, 2.65362968), (6.722503807, 2.679697149), (6.727389944, 2.692731968)],
                knots=[0, 0, 0, 0, 1.253673617, 2.623841347, 4.114270668, 5.751233548, 6.594491912, 7.409089316, 8.202422231, 8.983165545, 9.746111525, 10.498431446, 11.249153235, 12, 12, 12, 12], degree=3))
            Line((6.727389944, 2.692731968), (6.989609495, 2.692731968))
            Line((6.989609495, 2.692731968), (6.989609495, 0.992731968))
        make_face()
    extrude(amount=-CUT_EXTRUDE5_DEPTH, mode=Mode.SUBTRACT)


solid = part.part
